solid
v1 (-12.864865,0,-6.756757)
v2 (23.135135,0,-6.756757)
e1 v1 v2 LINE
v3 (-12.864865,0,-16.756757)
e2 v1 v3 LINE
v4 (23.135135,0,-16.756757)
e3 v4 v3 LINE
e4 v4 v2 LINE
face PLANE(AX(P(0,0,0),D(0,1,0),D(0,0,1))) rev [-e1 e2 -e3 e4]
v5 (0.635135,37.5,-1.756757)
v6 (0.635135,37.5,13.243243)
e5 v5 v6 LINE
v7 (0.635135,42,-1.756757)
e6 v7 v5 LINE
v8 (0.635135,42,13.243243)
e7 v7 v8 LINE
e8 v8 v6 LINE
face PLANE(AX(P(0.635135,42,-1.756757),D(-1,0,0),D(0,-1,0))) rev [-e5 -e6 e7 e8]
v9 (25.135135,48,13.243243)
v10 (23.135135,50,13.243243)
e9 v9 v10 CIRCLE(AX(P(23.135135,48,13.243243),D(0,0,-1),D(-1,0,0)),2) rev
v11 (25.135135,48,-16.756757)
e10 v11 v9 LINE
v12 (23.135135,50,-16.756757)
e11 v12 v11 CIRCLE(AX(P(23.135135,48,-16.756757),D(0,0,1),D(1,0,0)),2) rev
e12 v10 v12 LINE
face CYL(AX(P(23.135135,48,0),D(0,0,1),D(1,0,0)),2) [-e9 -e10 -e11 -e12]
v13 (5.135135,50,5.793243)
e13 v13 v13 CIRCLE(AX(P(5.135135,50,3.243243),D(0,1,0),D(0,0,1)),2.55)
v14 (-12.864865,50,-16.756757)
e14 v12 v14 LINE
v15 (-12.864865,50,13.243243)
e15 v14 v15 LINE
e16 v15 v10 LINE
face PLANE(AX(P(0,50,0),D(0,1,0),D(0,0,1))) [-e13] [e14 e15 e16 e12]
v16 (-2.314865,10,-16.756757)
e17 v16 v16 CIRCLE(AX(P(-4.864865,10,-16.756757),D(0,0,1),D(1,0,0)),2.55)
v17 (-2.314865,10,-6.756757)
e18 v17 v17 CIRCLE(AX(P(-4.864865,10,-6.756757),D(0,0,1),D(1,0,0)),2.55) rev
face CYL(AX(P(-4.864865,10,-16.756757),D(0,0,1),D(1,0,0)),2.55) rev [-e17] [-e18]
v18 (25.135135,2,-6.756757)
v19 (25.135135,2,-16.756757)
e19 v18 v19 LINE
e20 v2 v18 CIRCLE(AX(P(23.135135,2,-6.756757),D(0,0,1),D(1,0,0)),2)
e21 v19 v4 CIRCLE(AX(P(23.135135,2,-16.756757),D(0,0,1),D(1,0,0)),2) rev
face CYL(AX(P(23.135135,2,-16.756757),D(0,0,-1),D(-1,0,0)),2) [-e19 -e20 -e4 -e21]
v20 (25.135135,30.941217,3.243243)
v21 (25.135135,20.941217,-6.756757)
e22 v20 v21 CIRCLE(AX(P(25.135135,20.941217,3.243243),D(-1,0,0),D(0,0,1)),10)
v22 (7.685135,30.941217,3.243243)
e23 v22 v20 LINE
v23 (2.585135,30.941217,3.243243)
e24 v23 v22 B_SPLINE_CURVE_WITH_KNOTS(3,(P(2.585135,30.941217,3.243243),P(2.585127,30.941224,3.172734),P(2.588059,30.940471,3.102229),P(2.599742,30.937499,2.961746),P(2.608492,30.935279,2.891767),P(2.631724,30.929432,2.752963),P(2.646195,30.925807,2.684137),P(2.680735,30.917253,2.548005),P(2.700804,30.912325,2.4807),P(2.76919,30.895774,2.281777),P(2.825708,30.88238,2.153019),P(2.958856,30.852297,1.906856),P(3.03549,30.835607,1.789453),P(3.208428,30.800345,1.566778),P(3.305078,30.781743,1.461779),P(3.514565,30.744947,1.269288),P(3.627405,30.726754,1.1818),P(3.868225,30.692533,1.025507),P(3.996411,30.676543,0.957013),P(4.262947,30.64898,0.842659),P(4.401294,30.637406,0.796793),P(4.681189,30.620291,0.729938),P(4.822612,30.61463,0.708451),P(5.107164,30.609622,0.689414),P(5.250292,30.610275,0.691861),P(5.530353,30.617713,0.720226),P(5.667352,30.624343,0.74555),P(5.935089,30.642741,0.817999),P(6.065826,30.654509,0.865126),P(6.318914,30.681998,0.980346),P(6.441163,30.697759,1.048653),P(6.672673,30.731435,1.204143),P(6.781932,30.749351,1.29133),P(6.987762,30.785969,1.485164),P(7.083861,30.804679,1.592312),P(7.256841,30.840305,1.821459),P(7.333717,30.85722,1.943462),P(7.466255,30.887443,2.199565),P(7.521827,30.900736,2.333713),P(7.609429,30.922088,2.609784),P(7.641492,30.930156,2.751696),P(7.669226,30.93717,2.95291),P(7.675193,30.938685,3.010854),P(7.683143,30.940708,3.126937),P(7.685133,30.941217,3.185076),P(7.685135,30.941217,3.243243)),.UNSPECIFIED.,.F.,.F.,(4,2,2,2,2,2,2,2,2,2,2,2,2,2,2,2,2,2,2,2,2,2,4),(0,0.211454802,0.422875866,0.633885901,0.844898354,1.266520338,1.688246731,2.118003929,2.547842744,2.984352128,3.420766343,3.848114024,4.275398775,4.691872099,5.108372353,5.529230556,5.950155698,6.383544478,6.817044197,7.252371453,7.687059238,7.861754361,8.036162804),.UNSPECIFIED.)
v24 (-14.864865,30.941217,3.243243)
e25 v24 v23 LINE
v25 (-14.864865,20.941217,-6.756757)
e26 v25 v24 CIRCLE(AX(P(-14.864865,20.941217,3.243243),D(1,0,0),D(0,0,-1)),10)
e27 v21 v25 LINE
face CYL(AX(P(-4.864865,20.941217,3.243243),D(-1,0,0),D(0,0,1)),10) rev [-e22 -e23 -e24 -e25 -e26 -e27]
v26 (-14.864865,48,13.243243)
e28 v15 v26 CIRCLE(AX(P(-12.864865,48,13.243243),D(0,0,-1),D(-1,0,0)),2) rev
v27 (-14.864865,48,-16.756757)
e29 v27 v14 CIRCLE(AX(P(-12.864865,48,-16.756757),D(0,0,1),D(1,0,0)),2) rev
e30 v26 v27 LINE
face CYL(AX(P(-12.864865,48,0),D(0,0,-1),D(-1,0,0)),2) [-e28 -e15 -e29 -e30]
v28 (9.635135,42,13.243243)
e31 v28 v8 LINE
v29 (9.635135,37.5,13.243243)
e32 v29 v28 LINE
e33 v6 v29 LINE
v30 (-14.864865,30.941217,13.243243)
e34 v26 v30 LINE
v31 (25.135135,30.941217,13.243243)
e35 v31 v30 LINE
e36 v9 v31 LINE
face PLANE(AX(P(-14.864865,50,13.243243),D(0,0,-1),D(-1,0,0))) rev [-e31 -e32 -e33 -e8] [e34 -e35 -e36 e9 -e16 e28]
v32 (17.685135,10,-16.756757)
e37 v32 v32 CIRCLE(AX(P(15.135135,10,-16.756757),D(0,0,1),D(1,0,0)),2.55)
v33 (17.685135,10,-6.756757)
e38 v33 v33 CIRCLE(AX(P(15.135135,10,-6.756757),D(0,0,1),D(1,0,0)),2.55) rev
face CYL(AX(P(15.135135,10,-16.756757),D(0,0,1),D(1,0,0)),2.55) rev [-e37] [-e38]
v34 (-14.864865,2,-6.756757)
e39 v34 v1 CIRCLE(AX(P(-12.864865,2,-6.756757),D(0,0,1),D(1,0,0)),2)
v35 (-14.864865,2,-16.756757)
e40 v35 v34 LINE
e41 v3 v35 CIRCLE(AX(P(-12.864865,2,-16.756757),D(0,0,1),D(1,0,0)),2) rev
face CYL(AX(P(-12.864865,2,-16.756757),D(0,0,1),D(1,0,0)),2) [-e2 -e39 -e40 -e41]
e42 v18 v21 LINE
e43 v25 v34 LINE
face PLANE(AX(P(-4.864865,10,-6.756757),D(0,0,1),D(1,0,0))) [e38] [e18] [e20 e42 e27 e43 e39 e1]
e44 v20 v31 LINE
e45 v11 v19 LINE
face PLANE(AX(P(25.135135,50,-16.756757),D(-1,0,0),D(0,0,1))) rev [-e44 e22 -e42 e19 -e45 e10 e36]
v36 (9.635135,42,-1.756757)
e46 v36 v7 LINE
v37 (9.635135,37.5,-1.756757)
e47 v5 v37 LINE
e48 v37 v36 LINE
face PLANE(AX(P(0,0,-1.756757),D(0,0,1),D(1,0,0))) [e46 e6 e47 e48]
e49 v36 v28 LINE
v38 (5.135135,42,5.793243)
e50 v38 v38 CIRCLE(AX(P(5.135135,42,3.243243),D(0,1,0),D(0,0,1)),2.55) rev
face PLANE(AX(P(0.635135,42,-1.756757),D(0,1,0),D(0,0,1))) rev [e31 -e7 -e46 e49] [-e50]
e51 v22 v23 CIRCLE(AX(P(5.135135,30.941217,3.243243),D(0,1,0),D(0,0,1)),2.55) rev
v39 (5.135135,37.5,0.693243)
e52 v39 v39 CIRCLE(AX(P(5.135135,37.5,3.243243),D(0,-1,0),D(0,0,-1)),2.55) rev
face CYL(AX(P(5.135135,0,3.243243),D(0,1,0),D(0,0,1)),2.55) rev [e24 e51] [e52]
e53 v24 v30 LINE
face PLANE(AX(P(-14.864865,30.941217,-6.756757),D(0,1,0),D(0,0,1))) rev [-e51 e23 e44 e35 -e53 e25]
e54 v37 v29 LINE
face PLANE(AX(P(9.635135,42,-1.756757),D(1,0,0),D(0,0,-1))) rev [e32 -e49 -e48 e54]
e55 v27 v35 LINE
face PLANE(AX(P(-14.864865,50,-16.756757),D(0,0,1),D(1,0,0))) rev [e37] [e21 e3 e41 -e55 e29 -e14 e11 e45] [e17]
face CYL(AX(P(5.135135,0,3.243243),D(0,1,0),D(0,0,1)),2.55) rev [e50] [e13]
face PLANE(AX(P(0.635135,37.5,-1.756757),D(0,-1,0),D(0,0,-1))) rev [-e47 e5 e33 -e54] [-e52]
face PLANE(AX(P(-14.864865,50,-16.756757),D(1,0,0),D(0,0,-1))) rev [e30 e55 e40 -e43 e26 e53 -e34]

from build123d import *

# Parameters (mm, degrees)
SKETCH_1_W          = 40
SKETCH_1_H          = 30
EXTRUDE_1_DEPTH     = 50
SKETCH_2_R          = 2.55
CUT_EXTRUDE_1_DEPTH = 64.496259876
SKETCH_3_R          = 4.5
CUT_EXTRUDE_2_DEPTH = 20
SKETCH_4_R          = 2.55
CUT_EXTRUDE_3_DEPTH = 59.417154289
SKETCH_5_W          = 9
SKETCH_5_H          = 4.5
CUT_EXTRUDE_4_DEPTH = 15
SKETCH_7_W          = 40
SKETCH_7_H          = 30.941216598
CUT_EXTRUDE_5_DEPTH = 20
FILLET_1_R          = 10
FILLET_2_R          = 2


with BuildPart() as part:
    # 草图1 → 凸台-拉伸1 (new body)
    with BuildSketch(Plane(origin=(0, 0, 0), x_dir=(1, 0, 0), z_dir=(0, 1, 0))):
        with Locations((5.135135135, 1.756756757)):
            Rectangle(SKETCH_1_W, SKETCH_1_H)
    extrude(amount=EXTRUDE_1_DEPTH)

    # 草图2 → 切除-拉伸1 (cut, through all)
    with BuildSketch(Plane.XY.offset(13.243243243)):
        with Locations((-4.864864865, 10)):
            Circle(SKETCH_2_R)
        with Locations((15.135135135, 10)):
            Circle(SKETCH_2_R)
    extrude(amount=-CUT_EXTRUDE_1_DEPTH, mode=Mode.SUBTRACT)

    # 草图3 → 切除-拉伸2 (cut)
    with BuildSketch(Plane.XY.offset(13.243243243)):
        with Locations((-4.864864865, 10)):
            Circle(SKETCH_3_R)
        with Locations((15.135135135, 10)):
            Circle(SKETCH_3_R)
    extrude(amount=-CUT_EXTRUDE_2_DEPTH, mode=Mode.SUBTRACT)

    # 草图4 → 切除-拉伸3 (cut, through all)
    with BuildSketch(Plane(origin=(0, 50, 0), x_dir=(1, 0, 0), z_dir=(0, 1, 0))):
        with Locations(Location((5.135135135, -3.243243243, 0), (0, 0, 270))):
            Circle(SKETCH_4_R)
    extrude(amount=-CUT_EXTRUDE_3_DEPTH, mode=Mode.SUBTRACT)

    # 草图5 → 切除-拉伸4 (cut)
    with BuildSketch(Plane.XY.offset(13.243243243)):
        with Locations((5.135135135, 39.75)):
            Rectangle(SKETCH_5_W, SKETCH_5_H)
    extrude(amount=-CUT_EXTRUDE_4_DEPTH, mode=Mode.SUBTRACT)

    # 草图7 → 切除-拉伸5 (cut)
    with BuildSketch(Plane.XY.offset(13.243243243)):
        with Locations((5.135135135, 15.470608299)):
            Rectangle(SKETCH_7_W, SKETCH_7_H)
    extrude(amount=-CUT_EXTRUDE_5_DEPTH, mode=Mode.SUBTRACT)

    # 圆角1
    # the kernel refuses this fillet: 10 mm, written as the material it adds along each edge
    with BuildSketch(Plane(origin=(25.135135135, 30.941216598, -6.756756757), x_dir=(0, 0, 1), z_dir=(-1, 0, 0))) as fillet_1_piece_1_section:
        with BuildLine():
            CenterArc((FILLET_1_R, -FILLET_1_R), FILLET_1_R, 90, 90)
            Line((0, -FILLET_1_R), (0, 0))
            Line((0, 0), (FILLET_1_R, 0))
        make_face()
    fillet_1_piece_1 = extrude(amount=40, mode=Mode.PRIVATE)
    fillet_1_piece_1 = fillet_1_piece_1 - Plane(origin=(5.135135135, 28.670722108, 3.243243243), x_dir=(0, 0, 1), z_dir=(0, 1, 0)) * Cylinder(2.55, 120, mode=Mode.PRIVATE)
    add(fillet_1_piece_1)

    # 圆角2
    fillet_2_edges = [part.edges().sort_by_distance(p)[0] for p in [
        (25.135135135, 50, -1.756756757),
        (-14.864864865, 50, -1.756756757),
        (-14.864864865, 0, -11.756756757),
        (25.135135135, 0, -11.756756757),
    ]]
    fillet(fillet_2_edges, radius=FILLET_2_R)


solid = part.part
